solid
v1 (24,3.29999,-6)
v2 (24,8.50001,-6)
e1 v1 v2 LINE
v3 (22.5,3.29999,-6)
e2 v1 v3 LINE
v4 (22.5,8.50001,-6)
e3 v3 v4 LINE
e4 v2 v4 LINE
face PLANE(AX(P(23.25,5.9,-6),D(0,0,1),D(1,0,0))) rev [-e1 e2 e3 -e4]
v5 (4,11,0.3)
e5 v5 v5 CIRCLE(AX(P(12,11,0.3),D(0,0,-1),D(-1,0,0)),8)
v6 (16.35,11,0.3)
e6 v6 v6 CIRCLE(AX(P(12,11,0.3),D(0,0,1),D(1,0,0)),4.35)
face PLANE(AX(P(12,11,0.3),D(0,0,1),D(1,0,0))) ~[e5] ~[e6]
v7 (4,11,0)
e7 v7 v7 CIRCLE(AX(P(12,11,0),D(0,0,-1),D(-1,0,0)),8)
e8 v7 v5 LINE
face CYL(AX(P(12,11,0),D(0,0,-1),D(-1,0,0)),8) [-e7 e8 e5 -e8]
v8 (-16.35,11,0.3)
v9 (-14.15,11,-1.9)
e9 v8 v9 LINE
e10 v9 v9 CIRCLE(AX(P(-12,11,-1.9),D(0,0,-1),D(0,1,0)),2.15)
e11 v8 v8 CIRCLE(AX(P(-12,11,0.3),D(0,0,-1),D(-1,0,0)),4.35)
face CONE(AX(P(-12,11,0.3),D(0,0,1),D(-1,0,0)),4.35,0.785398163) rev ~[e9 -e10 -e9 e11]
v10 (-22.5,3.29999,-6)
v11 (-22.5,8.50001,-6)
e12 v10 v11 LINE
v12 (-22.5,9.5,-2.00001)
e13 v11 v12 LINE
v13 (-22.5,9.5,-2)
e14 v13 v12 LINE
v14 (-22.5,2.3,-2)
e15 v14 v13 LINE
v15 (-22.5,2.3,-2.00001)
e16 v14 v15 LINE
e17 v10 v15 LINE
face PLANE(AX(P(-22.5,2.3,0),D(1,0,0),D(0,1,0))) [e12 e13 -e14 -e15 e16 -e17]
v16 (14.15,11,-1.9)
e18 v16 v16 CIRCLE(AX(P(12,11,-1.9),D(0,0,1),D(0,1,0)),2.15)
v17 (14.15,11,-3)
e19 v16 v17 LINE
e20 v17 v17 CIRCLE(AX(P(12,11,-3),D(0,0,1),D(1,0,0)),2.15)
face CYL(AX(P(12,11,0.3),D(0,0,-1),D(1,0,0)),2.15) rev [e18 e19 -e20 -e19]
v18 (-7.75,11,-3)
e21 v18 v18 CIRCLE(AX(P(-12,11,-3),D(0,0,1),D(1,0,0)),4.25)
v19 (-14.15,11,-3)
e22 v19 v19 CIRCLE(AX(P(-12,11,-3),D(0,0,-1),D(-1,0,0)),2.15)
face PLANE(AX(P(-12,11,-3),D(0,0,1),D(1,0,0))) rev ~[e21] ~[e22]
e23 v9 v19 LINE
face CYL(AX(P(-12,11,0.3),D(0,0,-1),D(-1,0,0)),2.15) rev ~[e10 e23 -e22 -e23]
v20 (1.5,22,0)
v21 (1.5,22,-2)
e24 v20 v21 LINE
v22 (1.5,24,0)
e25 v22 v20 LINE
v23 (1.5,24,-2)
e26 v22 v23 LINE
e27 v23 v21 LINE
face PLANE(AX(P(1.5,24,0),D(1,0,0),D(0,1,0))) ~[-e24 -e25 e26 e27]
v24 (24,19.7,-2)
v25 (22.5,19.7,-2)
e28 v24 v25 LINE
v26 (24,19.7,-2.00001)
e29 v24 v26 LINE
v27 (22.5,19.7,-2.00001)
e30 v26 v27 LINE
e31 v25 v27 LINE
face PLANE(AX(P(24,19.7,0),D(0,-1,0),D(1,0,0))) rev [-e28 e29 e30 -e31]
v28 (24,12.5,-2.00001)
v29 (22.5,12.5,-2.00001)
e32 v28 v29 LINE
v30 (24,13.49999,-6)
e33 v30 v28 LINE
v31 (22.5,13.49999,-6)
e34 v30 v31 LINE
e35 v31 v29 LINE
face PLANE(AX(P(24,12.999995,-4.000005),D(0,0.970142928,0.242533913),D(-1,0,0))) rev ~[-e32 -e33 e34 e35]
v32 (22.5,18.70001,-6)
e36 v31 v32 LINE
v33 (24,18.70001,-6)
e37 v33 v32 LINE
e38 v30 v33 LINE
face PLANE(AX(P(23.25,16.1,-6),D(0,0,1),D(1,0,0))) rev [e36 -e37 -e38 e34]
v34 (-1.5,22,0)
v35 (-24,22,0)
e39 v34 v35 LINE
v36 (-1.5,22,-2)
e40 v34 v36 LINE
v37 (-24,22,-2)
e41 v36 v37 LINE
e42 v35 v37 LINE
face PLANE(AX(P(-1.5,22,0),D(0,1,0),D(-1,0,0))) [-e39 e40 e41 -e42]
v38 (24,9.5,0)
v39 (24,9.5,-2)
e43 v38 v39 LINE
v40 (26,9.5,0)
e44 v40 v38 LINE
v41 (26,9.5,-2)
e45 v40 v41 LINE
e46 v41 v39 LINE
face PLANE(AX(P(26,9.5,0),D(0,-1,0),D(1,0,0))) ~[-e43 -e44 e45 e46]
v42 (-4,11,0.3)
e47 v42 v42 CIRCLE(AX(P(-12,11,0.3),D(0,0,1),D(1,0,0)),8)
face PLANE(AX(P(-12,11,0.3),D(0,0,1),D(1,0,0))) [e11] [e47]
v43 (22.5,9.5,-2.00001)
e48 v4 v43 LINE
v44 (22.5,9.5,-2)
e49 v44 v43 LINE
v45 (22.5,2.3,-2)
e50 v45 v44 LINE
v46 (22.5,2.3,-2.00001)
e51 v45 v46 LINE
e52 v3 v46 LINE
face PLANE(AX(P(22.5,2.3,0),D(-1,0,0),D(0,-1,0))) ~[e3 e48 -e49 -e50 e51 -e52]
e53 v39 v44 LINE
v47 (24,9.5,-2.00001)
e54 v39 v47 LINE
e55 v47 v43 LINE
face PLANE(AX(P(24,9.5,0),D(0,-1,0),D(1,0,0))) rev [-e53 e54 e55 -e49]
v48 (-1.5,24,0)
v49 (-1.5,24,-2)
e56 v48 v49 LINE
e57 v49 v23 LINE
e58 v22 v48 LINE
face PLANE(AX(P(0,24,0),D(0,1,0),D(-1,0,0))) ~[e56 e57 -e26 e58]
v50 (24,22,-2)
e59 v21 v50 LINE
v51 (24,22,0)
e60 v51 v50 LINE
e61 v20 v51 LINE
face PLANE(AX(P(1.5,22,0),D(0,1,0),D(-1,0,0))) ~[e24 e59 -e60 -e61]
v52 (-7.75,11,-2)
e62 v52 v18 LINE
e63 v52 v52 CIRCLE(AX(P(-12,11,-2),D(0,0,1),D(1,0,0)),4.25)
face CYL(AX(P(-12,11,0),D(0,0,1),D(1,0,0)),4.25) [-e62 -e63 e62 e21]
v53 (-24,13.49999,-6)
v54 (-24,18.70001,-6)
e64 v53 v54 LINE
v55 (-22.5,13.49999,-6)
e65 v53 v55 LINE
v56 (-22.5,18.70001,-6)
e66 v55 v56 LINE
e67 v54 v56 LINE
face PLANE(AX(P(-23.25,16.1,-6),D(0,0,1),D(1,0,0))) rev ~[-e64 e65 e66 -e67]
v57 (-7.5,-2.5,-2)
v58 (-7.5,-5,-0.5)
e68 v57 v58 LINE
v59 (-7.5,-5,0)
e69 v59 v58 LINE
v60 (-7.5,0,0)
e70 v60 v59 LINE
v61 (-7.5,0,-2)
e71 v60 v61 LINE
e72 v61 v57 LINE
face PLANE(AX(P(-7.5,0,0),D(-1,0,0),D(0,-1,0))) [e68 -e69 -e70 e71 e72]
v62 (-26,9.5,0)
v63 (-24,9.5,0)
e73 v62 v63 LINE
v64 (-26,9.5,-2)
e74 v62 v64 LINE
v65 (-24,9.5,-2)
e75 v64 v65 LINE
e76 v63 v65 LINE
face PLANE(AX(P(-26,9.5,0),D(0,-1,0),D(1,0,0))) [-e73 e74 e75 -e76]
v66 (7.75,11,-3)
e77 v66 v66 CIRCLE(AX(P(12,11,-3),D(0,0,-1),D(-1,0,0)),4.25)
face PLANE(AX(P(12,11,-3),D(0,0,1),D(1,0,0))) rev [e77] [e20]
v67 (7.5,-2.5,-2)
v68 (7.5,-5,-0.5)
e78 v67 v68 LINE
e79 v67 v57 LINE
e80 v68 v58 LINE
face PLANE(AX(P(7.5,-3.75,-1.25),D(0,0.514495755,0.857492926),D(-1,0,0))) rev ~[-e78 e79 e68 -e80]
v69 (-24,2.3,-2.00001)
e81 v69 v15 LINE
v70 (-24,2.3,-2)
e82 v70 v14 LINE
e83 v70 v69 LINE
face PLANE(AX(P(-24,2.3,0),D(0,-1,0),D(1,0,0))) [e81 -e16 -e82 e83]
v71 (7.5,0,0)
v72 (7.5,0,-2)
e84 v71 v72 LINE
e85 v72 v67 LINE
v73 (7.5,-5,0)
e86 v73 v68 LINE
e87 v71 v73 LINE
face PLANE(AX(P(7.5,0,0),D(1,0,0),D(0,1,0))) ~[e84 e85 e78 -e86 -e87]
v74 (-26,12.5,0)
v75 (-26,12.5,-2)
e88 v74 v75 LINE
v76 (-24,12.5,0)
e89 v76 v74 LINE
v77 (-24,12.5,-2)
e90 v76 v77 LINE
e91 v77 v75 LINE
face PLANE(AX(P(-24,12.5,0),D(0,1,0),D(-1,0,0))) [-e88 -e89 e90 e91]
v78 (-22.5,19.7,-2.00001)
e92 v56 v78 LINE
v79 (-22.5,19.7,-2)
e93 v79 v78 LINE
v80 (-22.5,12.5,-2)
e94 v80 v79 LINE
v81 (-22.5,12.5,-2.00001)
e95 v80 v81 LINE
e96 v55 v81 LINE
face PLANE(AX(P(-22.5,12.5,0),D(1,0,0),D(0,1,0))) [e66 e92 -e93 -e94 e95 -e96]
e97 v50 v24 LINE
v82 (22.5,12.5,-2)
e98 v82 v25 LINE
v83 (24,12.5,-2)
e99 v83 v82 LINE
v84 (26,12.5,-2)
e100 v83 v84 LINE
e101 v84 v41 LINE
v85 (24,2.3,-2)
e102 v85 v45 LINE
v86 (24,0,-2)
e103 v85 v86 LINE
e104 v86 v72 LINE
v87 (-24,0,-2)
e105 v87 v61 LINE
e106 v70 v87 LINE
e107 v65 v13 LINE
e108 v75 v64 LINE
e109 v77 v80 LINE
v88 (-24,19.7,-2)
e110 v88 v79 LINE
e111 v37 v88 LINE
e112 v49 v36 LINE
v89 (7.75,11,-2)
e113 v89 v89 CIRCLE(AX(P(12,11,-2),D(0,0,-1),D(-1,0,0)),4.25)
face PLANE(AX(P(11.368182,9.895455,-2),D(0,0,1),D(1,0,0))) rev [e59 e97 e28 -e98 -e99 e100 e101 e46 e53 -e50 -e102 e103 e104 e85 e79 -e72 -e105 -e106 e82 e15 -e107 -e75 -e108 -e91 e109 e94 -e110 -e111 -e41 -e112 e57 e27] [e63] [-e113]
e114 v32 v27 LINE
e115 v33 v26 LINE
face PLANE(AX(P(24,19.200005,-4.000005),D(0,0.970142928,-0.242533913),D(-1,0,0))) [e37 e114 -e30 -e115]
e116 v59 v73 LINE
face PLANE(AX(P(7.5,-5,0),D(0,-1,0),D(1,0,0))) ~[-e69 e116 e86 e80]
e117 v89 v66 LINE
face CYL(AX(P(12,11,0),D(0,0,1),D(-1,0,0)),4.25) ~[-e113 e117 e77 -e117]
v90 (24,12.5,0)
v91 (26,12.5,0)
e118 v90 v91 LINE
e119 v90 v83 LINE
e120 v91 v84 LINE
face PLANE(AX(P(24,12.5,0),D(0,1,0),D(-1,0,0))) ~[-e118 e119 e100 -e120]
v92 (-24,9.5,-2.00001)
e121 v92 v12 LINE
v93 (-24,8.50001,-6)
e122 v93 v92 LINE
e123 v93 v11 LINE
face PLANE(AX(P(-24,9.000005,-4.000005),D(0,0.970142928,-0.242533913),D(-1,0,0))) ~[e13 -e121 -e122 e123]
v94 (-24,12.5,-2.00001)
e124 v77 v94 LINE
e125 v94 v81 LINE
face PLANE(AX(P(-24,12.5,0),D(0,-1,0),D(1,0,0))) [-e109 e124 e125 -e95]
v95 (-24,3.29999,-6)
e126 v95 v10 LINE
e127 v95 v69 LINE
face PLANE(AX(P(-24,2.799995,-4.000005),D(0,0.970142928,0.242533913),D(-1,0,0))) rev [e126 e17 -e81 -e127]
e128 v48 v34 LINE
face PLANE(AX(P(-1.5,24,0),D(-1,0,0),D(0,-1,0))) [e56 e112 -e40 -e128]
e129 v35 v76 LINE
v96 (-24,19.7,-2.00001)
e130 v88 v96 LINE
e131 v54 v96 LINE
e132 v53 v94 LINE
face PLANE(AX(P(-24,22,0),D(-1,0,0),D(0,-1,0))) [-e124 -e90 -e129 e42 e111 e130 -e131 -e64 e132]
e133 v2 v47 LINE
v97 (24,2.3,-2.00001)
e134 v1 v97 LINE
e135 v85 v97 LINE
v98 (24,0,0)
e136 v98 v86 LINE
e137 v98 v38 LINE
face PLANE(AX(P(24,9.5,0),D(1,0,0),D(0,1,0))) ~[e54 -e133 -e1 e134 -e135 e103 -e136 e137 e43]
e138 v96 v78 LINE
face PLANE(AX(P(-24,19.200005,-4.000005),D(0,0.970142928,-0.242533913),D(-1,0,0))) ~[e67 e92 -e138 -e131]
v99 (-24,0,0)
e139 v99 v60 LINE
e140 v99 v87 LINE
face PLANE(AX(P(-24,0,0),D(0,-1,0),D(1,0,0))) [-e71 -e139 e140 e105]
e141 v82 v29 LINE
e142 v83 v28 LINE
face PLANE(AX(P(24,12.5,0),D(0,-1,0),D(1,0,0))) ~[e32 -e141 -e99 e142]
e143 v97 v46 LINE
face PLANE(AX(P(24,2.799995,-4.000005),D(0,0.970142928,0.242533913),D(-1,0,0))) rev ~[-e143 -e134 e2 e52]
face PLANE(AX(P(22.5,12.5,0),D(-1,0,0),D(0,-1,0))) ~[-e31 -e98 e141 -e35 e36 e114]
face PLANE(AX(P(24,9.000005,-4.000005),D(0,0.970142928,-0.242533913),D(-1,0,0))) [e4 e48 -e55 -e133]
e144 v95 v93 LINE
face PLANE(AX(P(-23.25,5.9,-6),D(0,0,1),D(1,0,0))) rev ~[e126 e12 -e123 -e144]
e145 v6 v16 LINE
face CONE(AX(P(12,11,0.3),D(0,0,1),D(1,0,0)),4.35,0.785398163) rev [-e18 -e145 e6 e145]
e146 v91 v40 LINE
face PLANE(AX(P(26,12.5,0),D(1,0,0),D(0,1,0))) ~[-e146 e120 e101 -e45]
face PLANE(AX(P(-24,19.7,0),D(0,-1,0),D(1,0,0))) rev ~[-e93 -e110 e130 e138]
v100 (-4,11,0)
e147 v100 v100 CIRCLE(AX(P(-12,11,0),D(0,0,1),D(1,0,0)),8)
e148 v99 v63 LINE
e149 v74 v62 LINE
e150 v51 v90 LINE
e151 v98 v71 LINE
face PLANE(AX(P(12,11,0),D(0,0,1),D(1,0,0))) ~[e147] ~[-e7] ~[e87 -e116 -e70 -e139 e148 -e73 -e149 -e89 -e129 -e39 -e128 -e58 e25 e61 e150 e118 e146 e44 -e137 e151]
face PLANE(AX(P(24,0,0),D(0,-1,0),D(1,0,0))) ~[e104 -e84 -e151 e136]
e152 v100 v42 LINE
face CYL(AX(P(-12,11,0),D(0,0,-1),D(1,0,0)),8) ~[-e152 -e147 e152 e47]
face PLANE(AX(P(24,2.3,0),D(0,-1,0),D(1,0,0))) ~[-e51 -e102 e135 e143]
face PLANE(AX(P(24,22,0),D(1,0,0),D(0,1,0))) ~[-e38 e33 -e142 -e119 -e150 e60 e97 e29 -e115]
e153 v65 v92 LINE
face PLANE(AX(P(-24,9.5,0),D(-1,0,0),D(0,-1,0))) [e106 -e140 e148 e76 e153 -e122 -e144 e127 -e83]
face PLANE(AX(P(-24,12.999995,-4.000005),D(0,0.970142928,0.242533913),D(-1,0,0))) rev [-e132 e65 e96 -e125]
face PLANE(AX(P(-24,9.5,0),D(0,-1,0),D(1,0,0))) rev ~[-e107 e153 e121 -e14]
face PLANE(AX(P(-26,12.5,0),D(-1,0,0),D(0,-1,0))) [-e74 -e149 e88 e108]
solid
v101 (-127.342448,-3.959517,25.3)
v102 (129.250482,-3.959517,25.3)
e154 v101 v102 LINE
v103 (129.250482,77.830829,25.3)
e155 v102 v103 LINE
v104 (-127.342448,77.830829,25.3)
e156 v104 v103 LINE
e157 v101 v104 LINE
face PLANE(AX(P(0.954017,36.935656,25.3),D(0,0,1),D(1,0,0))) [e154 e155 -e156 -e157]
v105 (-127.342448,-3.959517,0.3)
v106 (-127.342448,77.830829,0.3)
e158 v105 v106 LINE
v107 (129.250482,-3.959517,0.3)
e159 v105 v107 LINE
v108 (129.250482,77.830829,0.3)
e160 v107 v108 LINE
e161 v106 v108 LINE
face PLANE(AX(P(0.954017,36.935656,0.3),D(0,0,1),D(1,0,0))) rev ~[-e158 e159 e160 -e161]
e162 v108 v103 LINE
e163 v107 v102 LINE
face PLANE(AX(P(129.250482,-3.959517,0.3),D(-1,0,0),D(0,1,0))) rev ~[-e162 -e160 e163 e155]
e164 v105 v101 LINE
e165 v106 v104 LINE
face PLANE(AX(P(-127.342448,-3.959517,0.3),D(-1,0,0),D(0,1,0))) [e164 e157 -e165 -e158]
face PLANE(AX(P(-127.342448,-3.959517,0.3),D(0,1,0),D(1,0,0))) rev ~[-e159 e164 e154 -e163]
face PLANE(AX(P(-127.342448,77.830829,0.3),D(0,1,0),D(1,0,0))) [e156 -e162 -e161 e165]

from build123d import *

# Parameters (mm, degrees)
F11_DEPTH       = 2
F12_W           = 1.5
F12_H           = 7.2
F13_DEPTH       = 6
F14_R           = 4.25
F15_DEPTH       = 3
F16_R           = 8
F17_DEPTH       = 0.3
F19_D           = 4.3
F19_CSINK_D     = 8.7
F19_CSINK_ANGLE = 90
F20_SIZE2       = 1.5
F20_SIZE        = 2.5
F21_SIZE2       = 3.99999
F21_SIZE        = 0.99999
F21_2_SIZE2     = 3.99999
F21_2_SIZE      = 0.99999
F22_SIZE2       = 3.99999
F22_SIZE        = 0.99999
F24_W           = 256.5929293633
F24_H           = 81.7903461866
F25_DEPTH       = 25


# Not quite as in the source:
# - a fillet or chamfer is up to 0.001 mm smaller than in the source, because OpenCascade refuses the exact size


with BuildPart() as f11:
    # F10 (on Top) → F11 (new body, through all)
    with BuildSketch(Plane.XY):
        Polygon((-24, 0), (-7.5, 0), (-7.5, -5), (0, -5), (0, 24), (-1.5, 24), (-1.5, 22), (-24, 22), (-24, 12.5), (-26, 12.5), (-26, 9.5), (-24, 9.5), align=None)
    extrude(amount=-F11_DEPTH)

    # F12 (on Top) → F13 (join, through all)
    with BuildSketch(Plane.XY):
        with Locations((-23.25, 5.9)):
            Rectangle(F12_W, F12_H)
        with Locations((-23.25, 16.1)):
            Rectangle(F12_W, F12_H)
    extrude(amount=-F13_DEPTH)

    # F14 (on Top) → F15 (join, through all)
    with BuildSketch(Plane.XY):
        with Locations((-12, 11)):
            Circle(F14_R)
    extrude(amount=-F15_DEPTH)

    # F16 (on Top) → F17 (join, through all)
    with BuildSketch(Plane.XY):
        with Locations((-12, 11)):
            Circle(F16_R)
    extrude(amount=F17_DEPTH)

    # F19 (through all)
    with Locations(Plane.XY.offset(0.3)):
        with Locations((-12, 11)):
            CounterSinkHole(F19_D / 2, F19_CSINK_D / 2, counter_sink_angle=F19_CSINK_ANGLE)

    # F20
    f20_edges = [f11.edges().sort_by_distance(p)[0] for p in [
        (-3.75, -5, -2),
    ]]
    f20_side = f11.faces().sort_by_distance((-23.610513, 1.15, -2))[0]
    chamfer(f20_edges, length=F20_SIZE, length2=F20_SIZE2, reference=f20_side)

    # F21 (size 1 and 4 in the source; OpenCascade refuses exactly that, so slightly less here)
    f21_edges = [f11.edges().sort_by_distance(p)[0] for p in [
        (-23.25, 2.3, -6),
        (-23.25, 9.5, -6),
    ]]
    f21_side = f11.faces().sort_by_distance((-23.25, 5.9, -6))[0]
    chamfer(f21_edges, length=F21_SIZE, length2=F21_SIZE2, reference=f21_side)

    # F21#2 (size 1 and 4 in the source; OpenCascade refuses exactly that, so slightly less here)
    f21_2_edges = [f11.edges().sort_by_distance(p)[0] for p in [
        (-23.25, 12.5, -6),
    ]]
    f21_2_side = f11.faces().sort_by_distance((-23.25, 16.1, -6))[0]
    chamfer(f21_2_edges, length=F21_2_SIZE, length2=F21_2_SIZE2, reference=f21_2_side)

    # F22 (size 1 and 4 in the source; OpenCascade refuses exactly that, so slightly less here)
    f22_edges = [f11.edges().sort_by_distance(p)[0] for p in [
        (-23.25, 19.7, -6),
    ]]
    f22_side = f11.faces().sort_by_distance((-23.25, 16.599995, -6))[0]
    chamfer(f22_edges, length=F22_SIZE, length2=F22_SIZE2, reference=f22_side)

    # F23: F11 across plane


with BuildPart() as f11_1:
    add(f11.part)
    add(f11.part.mirror(Plane.YZ))


with BuildPart() as f25:
    # F24 (on offset) → F25 (new body)
    with BuildSketch(Plane.XY.offset(0.3)):
        with Locations((0.9540170431, 36.935655633)):
            Rectangle(F24_W, F24_H)
    extrude(amount=F25_DEPTH)


solid = Compound([f11_1.part, f25.part])
